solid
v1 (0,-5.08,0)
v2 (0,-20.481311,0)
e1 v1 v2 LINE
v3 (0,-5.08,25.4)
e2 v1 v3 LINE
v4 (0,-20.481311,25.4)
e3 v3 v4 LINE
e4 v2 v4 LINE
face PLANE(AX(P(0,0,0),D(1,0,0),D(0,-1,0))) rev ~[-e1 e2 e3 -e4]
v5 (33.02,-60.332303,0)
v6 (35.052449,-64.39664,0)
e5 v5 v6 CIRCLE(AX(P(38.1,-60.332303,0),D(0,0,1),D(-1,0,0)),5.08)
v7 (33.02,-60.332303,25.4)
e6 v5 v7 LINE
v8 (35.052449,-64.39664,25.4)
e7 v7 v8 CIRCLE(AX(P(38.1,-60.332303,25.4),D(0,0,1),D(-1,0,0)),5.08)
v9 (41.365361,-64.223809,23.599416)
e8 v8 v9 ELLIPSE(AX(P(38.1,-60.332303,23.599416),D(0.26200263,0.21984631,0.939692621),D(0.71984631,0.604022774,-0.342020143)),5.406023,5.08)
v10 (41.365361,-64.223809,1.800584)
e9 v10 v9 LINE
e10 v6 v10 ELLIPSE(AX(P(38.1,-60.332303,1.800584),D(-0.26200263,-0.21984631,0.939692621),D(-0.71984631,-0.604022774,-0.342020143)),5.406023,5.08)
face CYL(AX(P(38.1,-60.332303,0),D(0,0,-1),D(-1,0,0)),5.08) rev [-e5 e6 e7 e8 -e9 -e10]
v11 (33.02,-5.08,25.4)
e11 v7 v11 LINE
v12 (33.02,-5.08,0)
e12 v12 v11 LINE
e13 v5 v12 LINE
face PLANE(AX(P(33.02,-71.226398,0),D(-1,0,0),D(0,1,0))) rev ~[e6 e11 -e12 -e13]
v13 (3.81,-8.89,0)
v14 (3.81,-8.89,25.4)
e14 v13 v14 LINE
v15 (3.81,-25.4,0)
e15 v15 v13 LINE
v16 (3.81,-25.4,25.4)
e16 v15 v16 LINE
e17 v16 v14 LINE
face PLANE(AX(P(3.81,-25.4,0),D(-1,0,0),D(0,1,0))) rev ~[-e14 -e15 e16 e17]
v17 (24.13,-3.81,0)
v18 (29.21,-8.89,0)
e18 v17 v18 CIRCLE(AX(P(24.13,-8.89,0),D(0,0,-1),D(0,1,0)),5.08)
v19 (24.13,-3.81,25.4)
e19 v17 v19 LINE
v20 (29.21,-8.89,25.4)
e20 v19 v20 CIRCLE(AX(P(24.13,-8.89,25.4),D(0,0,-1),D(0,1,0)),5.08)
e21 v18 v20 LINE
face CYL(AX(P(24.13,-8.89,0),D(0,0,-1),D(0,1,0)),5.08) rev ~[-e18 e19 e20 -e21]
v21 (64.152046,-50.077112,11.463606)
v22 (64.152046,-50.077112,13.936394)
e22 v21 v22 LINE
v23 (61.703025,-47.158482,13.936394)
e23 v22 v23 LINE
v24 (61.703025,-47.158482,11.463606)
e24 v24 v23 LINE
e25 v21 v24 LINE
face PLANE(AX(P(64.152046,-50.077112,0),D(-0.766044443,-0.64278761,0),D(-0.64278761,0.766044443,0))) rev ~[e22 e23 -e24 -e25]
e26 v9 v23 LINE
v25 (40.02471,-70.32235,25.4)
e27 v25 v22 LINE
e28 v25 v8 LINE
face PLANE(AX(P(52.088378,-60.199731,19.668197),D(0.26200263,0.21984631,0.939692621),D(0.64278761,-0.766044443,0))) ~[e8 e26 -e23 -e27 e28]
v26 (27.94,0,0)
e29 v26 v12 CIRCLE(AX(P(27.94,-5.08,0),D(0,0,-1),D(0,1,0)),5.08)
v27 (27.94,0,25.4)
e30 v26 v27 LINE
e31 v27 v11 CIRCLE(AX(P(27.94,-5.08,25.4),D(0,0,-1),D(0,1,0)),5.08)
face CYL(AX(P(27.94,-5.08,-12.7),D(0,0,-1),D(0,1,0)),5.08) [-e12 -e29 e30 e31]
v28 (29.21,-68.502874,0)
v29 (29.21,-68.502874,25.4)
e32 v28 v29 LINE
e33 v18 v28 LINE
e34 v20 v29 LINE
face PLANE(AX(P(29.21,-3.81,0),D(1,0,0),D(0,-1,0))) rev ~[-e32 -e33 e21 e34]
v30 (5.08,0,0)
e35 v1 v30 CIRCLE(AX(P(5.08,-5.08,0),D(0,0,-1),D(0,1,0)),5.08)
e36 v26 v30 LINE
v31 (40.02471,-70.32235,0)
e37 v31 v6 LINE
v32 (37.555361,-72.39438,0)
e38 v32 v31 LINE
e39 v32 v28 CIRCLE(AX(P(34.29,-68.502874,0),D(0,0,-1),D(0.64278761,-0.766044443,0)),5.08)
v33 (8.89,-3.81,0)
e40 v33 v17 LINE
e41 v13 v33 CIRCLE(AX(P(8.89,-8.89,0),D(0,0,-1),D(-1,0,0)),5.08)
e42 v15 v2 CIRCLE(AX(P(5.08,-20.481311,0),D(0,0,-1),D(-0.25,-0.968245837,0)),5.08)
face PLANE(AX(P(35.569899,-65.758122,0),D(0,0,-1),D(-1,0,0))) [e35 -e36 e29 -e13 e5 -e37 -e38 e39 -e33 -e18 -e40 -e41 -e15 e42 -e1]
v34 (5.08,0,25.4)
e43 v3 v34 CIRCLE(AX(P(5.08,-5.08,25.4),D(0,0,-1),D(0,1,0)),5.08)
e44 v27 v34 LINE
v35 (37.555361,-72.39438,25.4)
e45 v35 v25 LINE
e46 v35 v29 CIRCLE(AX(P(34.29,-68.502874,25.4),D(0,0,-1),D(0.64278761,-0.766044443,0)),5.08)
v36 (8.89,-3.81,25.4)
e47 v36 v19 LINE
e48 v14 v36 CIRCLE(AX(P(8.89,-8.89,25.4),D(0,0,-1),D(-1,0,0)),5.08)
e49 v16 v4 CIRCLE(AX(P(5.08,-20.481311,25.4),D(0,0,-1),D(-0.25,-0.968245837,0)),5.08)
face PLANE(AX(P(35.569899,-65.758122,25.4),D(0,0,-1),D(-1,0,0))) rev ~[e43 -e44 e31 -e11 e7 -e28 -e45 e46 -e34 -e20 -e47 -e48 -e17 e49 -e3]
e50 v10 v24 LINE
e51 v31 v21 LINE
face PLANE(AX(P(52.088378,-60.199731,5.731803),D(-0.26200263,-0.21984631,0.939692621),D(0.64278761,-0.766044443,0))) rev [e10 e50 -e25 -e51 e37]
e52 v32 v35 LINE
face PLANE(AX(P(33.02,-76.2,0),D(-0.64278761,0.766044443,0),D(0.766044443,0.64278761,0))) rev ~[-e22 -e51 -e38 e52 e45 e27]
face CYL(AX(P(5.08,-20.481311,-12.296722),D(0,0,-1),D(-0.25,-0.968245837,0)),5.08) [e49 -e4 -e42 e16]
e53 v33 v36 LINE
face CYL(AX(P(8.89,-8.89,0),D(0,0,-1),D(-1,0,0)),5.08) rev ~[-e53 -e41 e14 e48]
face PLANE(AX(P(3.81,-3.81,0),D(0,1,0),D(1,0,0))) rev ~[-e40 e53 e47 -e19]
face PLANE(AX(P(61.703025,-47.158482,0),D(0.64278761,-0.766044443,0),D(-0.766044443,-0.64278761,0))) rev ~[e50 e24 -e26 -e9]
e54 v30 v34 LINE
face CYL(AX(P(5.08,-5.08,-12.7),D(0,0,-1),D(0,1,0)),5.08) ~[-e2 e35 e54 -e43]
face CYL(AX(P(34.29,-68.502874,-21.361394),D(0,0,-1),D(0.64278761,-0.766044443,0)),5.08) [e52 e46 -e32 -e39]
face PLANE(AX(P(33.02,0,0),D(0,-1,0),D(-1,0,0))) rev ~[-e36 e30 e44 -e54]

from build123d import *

# Parameters (mm, degrees)
F1_DEPTH     = 25.4
F2_T1_DEPTH  = 25.4
F2_T3_DEPTH  = 25.4
F2_T5_DEPTH  = 25.4
F2_T7_DEPTH  = 50.8
F2_T9_DEPTH  = 50.8
F2_T11_DEPTH = 49.9934442484
F3_SIZE2     = 11.4636064984
F3_SIZE      = 31.496
F3_2_SIZE2   = 11.4636064984
F3_2_SIZE    = 31.496
F4_T1_DEPTH  = 50.8
F5_T1_DEPTH  = 68.1227876391


# Not quite as in the source:
# - a fillet or chamfer that OpenCascade refuses, or shapes differently, is made with other operations: its cross-section is extruded or revolved along the edge and cut away or added


with BuildPart() as f1:
    # F0 (on Top) → F1 (new body)
    with BuildSketch(Plane.XY):
        Polygon((33.02, 0), (0, 0), (0, -25.4), (3.81, -25.4), (3.81, -3.81), (29.21, -3.81), (29.21, -76.2), (33.02, -76.2), (33.02, -71.2263982276), align=None)
        Polygon((61.7030253754, -47.1584822141), (33.02, -71.2263982276), (33.02, -76.2), (64.1520461684, -50.0771115423), align=None)
    extrude(amount=F1_DEPTH)

    # F2: fillet of radius 5.08 on 6 edges, made by hand

    # F2_s2 → F2_t1 (join)
    with BuildSketch(Plane.XY):
        with BuildLine():
            ThreePointArc((3.81, -8.89), (5.2978975516, -5.2978975516), (8.89, -3.81))
            Line((8.89, -3.81), (3.81, -3.81))
            Line((3.81, -3.81), (3.81, -8.89))
        make_face()
    extrude(amount=F2_T1_DEPTH)

    # F2_s4 → F2_t3 (join)
    with BuildSketch(Plane.XY):
        with BuildLine():
            ThreePointArc((24.13, -3.81), (27.7221024484, -5.2978975516), (29.21, -8.89))
            Line((29.21, -8.89), (29.21, -3.81))
            Line((29.21, -3.81), (24.13, -3.81))
        make_face()
    extrude(amount=F2_T3_DEPTH)

    # F2_s6 → F2_t5 (join)
    with BuildSketch(Plane.XY):
        with BuildLine():
            ThreePointArc((33.02, -60.3323030715), (35.9530992304, -64.9363466296), (41.3653610572, -64.2238088425))
            Line((41.3653610572, -64.2238088425), (33.02, -71.2263982276))
            Line((33.02, -71.2263982276), (33.02, -60.3323030715))
        make_face()
    extrude(amount=F2_T5_DEPTH)

    # F2_s8 → F2_t7 (cut)
    with BuildSketch(Plane.XY.offset(-12.7)):
        with BuildLine():
            ThreePointArc((27.94, 0), (31.5321024484, -1.4878975516), (33.02, -5.08))
            Line((33.02, -5.08), (33.02, 0))
            Line((33.02, 0), (27.94, 0))
        make_face()
    extrude(amount=F2_T7_DEPTH, mode=Mode.SUBTRACT)

    # F2_s10 → F2_t9 (cut)
    with BuildSketch(Plane.XY.offset(-12.7)):
        with BuildLine():
            ThreePointArc((5.08, 0), (1.4878975516, -1.4878975516), (0, -5.08))
            Line((0, -5.08), (0, 0))
            Line((0, 0), (5.08, 0))
        make_face()
    extrude(amount=F2_T9_DEPTH, mode=Mode.SUBTRACT)

    # F2_s12 → F2_t11 (cut)
    with BuildSketch(Plane.XY.offset(-12.2967221242)):
        with BuildLine():
            ThreePointArc((3.81, -25.4), (1.0639073716, -23.5921631237), (0, -20.4813111503))
            Line((0, -20.4813111503), (0, -25.4))
            Line((0, -25.4), (3.81, -25.4))
        make_face()
    extrude(amount=F2_T11_DEPTH, mode=Mode.SUBTRACT)

    # F3
    f3_edges = [f1.edges().sort_by_distance(p)[0] for p in [
        (62.927536, -48.617797, 25.4),
    ]]
    f3_side = f1.faces().sort_by_distance((30.827761, -2.192239, 25.4))[0]
    chamfer(f3_edges, length=F3_SIZE, length2=F3_SIZE2, reference=f3_side)

    # F3#2
    f3_2_edges = [f1.edges().sort_by_distance(p)[0] for p in [
        (62.927536, -48.617797, 0),
    ]]
    f3_2_side = f1.faces().sort_by_distance((30.827761, -2.192239, 0))[0]
    chamfer(f3_2_edges, length=F3_2_SIZE, length2=F3_2_SIZE2, reference=f3_2_side)

    # F4: fillet of radius 5.08 on 1 edges, made by hand

    # F4_s2 → F4_t1 (cut)
    with BuildSketch(Plane.XY.offset(-12.7)):
        with BuildLine():
            ThreePointArc((34.29, -76.2), (30.6978975516, -74.7121024484), (29.21, -71.12))
            Line((29.21, -71.12), (29.21, -76.2))
            Line((29.21, -76.2), (34.29, -76.2))
        make_face()
    extrude(amount=F4_T1_DEPTH, mode=Mode.SUBTRACT)

    # F5: fillet of radius 5.08 on 1 edges, made by hand

    # F5_s2 → F5_t1 (cut)
    with BuildSketch(Plane.XY.offset(-21.3613938196)):
        with BuildLine():
            ThreePointArc((37.5553610572, -72.3943802096), (32.1430992304, -73.1069179967), (29.21, -68.5028744386))
            Line((29.21, -68.5028744386), (28.702, -68.5028744386))
            ThreePointArc((28.702, -68.5028744386), (28.702, -71.12), (33.0571094194, -76.5702958467))
            Line((33.0571094194, -76.5702958467), (33.495726487, -76.4639649832))
            Line((33.495726487, -76.4639649832), (37.8818971629, -72.7835307867))
            Line((37.8818971629, -72.7835307867), (37.5553610572, -72.3943802096))
        make_face()
    extrude(amount=F5_T1_DEPTH, mode=Mode.SUBTRACT)


solid = f1.part
